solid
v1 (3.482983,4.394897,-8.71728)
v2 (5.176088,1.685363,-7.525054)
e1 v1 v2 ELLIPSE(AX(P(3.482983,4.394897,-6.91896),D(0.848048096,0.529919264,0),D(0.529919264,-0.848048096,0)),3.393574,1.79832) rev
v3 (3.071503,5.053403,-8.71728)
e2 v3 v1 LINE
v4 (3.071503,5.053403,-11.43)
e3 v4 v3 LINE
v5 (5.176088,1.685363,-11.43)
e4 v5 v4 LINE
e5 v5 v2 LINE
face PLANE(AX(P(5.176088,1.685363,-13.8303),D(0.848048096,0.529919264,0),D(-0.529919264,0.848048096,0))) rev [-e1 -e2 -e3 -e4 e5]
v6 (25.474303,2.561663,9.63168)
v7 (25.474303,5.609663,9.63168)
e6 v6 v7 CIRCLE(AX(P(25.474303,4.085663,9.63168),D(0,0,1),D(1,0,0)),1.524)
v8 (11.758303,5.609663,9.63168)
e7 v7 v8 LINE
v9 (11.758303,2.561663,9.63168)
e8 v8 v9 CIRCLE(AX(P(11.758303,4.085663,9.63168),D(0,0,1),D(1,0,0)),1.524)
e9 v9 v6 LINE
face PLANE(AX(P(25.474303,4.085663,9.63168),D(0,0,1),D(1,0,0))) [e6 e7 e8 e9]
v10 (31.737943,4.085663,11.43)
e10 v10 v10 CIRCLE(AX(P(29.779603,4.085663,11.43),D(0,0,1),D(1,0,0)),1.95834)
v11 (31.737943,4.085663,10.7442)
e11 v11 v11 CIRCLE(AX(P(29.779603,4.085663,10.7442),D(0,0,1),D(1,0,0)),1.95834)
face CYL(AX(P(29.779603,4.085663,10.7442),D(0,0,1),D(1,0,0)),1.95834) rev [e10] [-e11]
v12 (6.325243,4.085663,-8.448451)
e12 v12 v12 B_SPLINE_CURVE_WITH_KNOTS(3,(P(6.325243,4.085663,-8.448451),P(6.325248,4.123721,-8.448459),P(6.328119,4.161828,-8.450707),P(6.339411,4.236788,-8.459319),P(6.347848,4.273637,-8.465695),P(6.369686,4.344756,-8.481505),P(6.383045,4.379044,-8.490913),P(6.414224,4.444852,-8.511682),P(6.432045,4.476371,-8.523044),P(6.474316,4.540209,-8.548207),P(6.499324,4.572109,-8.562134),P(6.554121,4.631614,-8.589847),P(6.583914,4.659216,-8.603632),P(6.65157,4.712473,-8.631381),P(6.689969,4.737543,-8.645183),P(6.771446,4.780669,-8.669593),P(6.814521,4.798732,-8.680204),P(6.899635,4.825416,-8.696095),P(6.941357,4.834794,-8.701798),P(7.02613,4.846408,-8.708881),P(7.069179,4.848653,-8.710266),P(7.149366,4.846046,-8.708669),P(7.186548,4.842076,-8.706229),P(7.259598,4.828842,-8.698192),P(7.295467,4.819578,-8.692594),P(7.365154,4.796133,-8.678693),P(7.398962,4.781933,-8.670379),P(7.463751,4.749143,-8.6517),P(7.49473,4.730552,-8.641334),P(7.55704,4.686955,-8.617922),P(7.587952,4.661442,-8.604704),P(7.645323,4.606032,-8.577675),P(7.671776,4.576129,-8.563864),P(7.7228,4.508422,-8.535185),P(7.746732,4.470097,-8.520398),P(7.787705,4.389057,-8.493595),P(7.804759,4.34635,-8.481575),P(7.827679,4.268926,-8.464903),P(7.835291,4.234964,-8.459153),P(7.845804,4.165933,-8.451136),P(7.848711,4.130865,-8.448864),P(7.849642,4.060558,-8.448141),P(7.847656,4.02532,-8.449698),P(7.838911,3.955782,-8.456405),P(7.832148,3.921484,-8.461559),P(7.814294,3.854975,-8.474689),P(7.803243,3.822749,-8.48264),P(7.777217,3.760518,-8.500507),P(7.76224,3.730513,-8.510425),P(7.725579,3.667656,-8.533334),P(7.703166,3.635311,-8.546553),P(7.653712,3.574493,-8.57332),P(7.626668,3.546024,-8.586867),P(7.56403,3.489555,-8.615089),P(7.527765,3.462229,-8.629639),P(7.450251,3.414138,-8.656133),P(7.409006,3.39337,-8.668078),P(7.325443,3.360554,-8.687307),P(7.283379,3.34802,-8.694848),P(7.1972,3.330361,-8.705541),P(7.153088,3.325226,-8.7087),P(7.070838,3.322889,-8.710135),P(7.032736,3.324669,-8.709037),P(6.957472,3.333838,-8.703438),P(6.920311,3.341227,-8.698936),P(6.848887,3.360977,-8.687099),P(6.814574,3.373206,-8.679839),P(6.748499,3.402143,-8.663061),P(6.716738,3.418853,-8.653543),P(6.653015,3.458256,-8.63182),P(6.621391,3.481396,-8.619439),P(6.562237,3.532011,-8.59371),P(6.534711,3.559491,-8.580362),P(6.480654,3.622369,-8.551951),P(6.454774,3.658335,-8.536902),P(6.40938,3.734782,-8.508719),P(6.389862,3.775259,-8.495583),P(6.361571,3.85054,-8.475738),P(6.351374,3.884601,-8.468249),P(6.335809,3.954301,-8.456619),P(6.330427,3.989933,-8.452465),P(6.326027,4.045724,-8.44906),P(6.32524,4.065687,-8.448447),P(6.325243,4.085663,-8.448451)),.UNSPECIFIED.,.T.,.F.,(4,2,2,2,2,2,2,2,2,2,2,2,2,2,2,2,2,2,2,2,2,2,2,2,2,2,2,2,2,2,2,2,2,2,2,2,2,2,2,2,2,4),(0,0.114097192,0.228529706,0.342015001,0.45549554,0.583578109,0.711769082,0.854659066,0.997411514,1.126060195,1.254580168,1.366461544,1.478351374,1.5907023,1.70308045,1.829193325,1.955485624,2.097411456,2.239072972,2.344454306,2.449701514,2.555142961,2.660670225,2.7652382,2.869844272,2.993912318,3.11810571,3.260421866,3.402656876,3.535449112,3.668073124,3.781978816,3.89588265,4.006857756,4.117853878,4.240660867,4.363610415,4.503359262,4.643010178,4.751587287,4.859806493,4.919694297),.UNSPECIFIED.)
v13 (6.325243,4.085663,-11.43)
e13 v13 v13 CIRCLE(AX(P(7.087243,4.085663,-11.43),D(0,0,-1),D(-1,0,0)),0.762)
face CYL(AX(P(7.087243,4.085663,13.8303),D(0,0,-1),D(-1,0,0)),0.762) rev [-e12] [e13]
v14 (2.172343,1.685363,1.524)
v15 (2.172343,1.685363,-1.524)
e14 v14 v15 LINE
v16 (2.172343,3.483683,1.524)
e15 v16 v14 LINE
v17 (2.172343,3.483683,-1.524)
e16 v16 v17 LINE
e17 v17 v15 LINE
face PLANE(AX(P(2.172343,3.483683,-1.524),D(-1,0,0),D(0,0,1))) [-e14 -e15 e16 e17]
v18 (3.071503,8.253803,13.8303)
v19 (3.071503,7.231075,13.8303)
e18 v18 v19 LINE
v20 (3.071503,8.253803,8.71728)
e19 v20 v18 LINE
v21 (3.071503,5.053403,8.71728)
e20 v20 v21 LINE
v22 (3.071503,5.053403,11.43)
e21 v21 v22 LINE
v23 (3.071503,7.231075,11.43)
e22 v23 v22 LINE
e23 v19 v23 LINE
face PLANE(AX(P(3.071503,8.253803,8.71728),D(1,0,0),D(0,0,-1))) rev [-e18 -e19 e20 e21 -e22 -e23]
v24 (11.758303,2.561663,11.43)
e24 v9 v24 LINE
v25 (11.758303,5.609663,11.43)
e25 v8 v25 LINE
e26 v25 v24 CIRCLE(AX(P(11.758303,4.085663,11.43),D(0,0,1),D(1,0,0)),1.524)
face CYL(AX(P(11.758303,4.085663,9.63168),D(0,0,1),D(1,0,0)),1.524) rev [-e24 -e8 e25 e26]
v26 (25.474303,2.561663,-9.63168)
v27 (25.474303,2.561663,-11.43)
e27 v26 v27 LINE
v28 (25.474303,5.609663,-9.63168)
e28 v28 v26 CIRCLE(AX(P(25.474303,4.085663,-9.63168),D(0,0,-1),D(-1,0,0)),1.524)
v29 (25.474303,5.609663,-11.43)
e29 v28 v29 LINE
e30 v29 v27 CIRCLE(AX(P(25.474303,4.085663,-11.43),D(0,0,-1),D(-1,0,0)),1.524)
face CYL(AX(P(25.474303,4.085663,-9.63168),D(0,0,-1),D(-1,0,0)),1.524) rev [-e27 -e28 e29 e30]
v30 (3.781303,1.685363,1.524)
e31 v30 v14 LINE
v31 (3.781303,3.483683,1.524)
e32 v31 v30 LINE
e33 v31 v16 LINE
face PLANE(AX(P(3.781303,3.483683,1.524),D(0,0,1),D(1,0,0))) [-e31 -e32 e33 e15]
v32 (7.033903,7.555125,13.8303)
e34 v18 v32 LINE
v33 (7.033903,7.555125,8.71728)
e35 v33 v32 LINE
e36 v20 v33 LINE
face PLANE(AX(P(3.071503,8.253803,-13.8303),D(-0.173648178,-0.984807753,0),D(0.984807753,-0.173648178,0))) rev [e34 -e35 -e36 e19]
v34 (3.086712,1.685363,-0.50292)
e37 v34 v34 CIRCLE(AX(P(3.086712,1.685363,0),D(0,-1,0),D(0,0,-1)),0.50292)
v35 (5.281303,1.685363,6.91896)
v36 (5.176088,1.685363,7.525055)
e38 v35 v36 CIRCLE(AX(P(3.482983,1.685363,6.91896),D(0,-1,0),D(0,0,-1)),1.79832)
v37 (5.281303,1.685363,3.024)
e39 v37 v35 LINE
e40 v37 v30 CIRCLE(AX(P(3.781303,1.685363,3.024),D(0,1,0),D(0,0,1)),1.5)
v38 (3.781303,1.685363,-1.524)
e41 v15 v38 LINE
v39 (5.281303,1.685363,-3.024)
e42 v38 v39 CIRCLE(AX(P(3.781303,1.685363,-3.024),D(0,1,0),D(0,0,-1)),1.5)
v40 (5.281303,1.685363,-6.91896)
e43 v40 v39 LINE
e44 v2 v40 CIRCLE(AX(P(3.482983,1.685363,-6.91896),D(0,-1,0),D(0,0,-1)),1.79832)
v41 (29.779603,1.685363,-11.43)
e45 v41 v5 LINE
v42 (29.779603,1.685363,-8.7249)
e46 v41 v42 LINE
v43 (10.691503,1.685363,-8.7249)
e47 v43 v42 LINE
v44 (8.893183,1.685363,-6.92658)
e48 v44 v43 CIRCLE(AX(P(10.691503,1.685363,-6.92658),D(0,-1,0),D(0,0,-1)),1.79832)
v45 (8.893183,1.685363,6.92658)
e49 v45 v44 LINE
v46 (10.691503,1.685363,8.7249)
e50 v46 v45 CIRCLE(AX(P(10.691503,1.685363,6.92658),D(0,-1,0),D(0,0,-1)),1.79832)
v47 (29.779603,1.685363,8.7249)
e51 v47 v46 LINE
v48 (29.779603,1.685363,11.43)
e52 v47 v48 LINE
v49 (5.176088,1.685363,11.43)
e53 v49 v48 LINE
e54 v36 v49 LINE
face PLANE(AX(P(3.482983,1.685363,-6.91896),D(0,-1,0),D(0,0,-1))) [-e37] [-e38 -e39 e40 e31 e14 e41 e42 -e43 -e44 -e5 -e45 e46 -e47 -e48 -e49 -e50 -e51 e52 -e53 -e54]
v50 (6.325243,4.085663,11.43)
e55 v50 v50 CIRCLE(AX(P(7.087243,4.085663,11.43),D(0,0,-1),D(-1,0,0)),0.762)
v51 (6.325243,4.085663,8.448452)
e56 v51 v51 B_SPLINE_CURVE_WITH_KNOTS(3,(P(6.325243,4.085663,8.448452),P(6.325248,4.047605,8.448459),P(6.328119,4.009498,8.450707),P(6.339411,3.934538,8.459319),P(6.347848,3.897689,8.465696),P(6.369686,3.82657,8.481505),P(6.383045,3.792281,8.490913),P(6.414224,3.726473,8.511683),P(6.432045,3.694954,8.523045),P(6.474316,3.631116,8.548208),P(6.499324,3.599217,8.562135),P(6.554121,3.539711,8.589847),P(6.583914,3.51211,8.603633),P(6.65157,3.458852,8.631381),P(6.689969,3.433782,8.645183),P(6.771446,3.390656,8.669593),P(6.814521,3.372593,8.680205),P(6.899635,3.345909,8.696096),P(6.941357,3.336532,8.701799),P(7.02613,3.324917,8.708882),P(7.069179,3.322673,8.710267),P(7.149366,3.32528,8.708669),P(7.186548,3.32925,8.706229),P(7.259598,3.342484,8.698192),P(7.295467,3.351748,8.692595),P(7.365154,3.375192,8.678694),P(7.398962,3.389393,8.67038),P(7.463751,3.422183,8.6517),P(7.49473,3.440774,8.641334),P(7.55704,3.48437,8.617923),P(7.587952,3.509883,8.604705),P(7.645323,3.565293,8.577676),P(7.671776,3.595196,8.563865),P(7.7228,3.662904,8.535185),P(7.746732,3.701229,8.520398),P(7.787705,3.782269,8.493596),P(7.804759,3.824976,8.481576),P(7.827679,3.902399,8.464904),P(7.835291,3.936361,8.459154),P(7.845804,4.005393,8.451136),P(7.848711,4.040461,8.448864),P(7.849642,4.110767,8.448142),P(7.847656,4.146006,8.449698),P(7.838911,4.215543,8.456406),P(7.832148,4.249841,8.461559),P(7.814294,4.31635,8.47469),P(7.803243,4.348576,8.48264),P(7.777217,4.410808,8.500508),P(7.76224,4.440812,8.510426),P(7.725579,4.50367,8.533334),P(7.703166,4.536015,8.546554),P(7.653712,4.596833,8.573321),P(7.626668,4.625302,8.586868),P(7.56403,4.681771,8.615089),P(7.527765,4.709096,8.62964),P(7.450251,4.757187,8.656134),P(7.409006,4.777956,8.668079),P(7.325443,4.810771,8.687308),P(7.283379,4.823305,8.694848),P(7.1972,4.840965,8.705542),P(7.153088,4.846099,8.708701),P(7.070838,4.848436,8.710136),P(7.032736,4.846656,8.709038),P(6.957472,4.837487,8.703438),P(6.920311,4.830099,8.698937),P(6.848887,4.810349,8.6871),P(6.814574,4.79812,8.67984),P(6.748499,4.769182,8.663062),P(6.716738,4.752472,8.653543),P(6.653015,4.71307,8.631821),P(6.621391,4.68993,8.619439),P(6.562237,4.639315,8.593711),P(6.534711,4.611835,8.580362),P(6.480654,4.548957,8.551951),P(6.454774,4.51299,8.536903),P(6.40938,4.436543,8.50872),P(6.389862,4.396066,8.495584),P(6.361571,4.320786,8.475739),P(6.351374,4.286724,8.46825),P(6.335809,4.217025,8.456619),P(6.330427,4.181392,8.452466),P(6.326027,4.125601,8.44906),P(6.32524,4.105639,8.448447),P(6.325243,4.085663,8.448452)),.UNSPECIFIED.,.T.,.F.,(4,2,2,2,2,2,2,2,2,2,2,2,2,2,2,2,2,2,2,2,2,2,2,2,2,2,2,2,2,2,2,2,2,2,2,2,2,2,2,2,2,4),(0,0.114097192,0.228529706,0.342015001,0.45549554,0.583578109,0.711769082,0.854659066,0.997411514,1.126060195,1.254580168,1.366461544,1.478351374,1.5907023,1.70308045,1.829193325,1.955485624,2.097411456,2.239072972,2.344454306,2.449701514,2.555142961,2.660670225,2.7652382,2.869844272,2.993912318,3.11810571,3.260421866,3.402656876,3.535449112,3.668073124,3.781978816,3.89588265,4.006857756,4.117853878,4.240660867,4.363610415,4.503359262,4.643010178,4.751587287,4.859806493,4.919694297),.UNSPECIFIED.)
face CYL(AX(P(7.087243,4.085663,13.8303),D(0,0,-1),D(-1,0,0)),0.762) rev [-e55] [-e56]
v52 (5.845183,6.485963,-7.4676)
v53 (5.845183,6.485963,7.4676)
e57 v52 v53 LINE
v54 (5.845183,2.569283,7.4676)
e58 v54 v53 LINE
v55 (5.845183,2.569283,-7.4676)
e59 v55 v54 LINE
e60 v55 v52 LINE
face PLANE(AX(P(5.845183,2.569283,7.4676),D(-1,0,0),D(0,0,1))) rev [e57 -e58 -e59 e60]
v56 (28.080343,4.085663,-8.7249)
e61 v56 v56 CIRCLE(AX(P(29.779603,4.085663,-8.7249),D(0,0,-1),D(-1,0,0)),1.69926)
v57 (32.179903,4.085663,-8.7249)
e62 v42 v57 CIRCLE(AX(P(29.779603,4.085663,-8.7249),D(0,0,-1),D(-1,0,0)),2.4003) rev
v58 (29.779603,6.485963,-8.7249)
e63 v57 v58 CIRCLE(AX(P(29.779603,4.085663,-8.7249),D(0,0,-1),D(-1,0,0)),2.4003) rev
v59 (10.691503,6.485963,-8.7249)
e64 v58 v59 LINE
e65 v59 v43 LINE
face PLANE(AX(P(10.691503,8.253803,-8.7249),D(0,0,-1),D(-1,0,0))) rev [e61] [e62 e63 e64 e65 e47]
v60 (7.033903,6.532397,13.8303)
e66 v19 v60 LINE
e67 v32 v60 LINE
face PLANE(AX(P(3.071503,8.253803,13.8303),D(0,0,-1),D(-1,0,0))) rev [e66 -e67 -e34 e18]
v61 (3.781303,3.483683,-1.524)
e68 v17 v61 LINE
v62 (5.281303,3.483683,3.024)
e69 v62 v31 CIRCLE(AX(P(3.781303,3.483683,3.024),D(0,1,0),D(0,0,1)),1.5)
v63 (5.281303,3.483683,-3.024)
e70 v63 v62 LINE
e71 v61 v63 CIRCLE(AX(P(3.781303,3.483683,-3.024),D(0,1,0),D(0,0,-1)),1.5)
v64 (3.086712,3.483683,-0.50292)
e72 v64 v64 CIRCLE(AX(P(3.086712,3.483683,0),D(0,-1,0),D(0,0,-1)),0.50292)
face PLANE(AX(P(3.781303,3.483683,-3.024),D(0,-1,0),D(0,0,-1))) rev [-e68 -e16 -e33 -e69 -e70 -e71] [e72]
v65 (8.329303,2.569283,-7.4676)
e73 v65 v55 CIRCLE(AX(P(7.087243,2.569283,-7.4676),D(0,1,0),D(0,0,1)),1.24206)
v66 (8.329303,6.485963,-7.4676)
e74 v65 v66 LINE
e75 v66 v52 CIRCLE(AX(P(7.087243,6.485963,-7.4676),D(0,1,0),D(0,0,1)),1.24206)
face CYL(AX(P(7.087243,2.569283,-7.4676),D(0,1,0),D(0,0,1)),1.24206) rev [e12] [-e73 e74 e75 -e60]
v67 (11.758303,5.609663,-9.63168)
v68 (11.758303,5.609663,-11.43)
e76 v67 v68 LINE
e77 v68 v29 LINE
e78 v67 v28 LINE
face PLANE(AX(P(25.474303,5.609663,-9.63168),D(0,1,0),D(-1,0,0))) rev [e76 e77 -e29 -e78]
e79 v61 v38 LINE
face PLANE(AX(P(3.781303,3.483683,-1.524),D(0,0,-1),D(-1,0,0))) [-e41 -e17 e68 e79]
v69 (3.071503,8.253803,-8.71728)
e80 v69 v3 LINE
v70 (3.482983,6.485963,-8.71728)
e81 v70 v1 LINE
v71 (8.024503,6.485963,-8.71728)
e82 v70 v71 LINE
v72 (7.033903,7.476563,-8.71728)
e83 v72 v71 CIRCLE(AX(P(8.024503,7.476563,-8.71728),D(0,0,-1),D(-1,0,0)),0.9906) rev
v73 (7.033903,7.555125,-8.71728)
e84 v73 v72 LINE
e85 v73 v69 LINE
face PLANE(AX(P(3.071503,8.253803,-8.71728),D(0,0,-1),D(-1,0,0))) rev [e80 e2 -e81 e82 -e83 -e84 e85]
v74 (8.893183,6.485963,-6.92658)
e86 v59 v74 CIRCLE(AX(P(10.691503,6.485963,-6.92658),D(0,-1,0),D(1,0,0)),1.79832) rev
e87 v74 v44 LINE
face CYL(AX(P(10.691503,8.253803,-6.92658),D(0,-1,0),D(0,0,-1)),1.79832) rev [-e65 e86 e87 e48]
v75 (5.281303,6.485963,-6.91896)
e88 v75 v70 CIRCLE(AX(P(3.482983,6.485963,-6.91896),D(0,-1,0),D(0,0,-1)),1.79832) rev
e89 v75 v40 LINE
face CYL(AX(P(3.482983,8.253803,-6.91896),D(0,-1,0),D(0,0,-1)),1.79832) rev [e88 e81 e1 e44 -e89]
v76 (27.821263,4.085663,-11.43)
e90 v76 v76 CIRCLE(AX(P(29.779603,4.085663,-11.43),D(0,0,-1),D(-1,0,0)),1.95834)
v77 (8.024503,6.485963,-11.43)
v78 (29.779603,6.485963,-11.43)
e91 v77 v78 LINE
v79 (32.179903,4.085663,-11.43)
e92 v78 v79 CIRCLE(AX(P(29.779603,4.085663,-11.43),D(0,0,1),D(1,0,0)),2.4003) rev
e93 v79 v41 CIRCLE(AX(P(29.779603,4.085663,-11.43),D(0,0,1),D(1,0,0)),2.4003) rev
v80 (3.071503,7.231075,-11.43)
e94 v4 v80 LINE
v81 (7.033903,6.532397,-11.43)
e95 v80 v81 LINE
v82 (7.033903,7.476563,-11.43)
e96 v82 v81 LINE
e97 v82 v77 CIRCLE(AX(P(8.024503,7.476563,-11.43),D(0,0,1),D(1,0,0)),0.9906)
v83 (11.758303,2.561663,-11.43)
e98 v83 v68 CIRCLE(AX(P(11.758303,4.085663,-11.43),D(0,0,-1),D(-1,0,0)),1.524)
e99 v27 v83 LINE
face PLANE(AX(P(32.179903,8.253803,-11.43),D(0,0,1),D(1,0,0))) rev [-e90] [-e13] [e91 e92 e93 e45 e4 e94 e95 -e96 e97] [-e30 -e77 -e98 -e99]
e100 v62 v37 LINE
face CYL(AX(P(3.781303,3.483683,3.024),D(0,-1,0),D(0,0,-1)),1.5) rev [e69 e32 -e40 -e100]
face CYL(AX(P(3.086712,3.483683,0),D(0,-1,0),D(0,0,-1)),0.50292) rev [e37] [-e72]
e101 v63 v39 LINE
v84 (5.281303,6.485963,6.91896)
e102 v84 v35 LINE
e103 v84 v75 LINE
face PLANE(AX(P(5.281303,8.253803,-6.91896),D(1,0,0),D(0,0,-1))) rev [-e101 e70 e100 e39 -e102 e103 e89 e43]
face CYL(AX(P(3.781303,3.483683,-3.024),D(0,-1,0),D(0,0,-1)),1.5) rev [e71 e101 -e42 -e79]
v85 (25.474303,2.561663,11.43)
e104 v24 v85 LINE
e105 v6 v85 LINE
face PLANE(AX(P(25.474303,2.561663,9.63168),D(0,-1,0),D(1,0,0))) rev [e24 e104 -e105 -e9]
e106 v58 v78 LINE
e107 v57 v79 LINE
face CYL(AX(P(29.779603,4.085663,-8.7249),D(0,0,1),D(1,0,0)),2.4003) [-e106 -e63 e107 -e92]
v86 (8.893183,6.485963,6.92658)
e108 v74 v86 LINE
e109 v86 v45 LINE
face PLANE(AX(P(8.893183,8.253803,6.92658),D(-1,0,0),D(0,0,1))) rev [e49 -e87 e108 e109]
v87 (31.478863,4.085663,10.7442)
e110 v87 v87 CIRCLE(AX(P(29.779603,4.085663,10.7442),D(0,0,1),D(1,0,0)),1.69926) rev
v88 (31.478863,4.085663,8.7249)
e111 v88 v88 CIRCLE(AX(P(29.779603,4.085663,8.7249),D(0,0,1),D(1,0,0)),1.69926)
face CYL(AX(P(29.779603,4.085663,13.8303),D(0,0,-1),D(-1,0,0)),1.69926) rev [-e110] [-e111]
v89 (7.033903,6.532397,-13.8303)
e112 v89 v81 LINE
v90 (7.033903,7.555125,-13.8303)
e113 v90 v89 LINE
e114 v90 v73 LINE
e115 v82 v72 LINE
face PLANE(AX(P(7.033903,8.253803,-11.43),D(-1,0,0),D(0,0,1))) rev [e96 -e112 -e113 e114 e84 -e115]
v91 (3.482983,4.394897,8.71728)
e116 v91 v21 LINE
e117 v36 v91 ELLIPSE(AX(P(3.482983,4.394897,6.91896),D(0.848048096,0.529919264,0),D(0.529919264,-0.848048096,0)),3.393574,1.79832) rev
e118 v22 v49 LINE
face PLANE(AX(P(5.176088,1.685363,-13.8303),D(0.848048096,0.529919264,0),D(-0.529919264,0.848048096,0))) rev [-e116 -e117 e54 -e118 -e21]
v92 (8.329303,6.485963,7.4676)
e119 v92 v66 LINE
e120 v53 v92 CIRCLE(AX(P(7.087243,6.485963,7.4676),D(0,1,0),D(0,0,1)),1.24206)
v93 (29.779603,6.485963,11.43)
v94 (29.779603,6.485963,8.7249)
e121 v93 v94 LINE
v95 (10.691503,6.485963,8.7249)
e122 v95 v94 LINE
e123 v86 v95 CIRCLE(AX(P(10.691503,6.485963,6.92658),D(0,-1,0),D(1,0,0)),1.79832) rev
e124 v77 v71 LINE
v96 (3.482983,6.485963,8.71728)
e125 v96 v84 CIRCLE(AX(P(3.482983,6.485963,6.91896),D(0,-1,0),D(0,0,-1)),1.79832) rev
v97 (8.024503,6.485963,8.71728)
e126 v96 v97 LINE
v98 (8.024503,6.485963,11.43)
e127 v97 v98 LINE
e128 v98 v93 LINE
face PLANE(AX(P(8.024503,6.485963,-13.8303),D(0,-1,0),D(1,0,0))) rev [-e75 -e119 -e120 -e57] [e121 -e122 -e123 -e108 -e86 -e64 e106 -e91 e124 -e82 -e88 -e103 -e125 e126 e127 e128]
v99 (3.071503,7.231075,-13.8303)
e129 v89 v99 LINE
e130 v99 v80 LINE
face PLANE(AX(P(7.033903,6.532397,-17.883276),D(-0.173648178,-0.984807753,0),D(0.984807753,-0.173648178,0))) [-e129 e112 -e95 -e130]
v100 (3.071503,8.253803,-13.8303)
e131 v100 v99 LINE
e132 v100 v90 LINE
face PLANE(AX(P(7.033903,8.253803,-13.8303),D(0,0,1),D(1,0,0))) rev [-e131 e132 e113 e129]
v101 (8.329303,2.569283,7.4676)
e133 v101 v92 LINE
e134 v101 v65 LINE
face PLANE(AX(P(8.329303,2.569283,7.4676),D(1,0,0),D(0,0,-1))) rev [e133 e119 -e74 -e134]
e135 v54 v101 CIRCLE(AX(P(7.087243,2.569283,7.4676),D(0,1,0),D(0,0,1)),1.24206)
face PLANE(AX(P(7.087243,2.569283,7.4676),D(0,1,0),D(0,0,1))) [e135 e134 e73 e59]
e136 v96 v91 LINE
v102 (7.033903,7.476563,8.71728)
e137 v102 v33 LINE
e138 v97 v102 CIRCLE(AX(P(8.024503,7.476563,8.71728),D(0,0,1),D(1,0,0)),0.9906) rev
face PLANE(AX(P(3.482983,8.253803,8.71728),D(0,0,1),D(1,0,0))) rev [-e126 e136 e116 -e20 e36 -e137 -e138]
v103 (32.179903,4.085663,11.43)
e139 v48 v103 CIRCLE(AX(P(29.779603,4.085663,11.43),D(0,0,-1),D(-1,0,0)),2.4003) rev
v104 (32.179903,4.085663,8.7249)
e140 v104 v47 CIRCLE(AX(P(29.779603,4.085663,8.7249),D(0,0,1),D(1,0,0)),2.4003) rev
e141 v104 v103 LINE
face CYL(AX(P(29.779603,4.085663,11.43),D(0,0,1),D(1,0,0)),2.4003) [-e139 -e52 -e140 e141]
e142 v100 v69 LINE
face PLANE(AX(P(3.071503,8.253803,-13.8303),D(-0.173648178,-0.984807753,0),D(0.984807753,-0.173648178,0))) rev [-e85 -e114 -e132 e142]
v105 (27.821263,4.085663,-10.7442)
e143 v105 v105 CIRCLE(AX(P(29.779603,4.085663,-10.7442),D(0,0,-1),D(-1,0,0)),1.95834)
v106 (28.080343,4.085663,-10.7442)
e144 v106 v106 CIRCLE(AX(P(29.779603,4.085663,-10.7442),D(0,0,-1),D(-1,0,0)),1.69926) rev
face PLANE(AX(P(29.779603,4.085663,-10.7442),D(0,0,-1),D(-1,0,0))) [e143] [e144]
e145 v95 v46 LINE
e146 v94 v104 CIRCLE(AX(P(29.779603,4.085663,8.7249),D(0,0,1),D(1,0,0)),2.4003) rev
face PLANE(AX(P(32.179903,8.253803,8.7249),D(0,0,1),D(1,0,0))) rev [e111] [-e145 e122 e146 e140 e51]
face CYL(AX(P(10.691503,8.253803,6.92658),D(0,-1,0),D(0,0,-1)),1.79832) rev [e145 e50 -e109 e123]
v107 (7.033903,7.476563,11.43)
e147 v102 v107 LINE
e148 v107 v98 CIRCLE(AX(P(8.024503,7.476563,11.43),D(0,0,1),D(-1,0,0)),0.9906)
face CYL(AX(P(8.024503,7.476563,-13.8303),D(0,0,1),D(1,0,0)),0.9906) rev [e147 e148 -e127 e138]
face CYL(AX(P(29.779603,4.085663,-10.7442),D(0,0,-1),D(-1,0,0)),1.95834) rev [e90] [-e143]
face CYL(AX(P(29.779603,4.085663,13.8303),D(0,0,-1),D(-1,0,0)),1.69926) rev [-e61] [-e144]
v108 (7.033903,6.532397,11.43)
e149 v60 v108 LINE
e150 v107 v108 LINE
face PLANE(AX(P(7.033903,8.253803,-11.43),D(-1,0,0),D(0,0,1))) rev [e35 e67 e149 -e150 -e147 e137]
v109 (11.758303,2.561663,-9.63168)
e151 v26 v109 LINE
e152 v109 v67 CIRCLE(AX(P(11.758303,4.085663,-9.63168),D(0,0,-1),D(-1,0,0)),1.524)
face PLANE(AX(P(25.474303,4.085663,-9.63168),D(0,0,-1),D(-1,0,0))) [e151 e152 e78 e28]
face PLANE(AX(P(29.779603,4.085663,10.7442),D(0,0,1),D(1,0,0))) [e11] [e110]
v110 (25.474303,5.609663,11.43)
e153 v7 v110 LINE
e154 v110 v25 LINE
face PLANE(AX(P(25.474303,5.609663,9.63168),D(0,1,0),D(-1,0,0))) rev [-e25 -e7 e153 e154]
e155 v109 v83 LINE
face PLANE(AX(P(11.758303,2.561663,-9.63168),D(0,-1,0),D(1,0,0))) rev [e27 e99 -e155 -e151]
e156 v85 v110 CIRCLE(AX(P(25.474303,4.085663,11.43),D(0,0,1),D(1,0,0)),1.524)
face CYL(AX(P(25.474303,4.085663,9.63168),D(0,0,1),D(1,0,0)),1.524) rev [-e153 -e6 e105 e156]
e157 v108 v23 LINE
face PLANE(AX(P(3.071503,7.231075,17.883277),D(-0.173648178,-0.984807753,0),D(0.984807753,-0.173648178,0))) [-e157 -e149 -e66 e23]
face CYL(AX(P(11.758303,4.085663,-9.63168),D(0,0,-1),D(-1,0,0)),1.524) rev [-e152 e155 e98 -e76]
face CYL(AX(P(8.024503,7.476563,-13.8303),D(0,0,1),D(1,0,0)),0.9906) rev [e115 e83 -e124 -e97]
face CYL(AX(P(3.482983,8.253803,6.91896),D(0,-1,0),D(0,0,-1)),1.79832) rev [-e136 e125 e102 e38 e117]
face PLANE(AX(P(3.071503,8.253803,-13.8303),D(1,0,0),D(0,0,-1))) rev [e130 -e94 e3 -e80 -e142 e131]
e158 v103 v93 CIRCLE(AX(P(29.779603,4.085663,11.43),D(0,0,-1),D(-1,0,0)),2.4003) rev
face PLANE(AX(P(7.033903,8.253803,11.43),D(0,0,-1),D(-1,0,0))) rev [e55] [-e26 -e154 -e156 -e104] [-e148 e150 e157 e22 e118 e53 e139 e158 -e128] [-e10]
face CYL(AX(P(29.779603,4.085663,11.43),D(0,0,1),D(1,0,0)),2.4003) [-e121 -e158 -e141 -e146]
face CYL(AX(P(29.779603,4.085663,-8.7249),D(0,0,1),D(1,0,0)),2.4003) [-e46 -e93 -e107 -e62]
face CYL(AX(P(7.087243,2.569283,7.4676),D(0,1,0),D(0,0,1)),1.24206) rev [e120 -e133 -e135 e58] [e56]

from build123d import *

# Parameters (mm, degrees)
BOSS_EXTRUDE1_DEPTH = 10.9474
CUT_EXTRUDE1_DEPTH  = 66.230102934
CUT_EXTRUDE2_DEPTH  = 63.46692107
SKETCH4_W           = 29.0576
SKETCH4_H           = 2.9464
CUT_EXTRUDE3_DEPTH  = 10.9474
CUT_EXTRUDE4_DEPTH  = 6.5278
FILLET1_R           = 4.0005
CUT_EXTRUDE5_DEPTH  = 66.230102934
CUT_EXTRUDE6_DEPTH  = 4.0005
CUT_EXTRUDE7_DEPTH  = 4.0005
SKETCH9_R           = 2.8321
CUT_EXTRUDE8_DEPTH  = 63.46692107
SKETCH10_R          = 3.2639
CUT_EXTRUDE9_DEPTH  = 1.143
CUT_EXTRUDE10_START = -1.143
SKETCH11_R          = 3.2639
CUT_EXTRUDE10_DEPTH = 1.143
CUT_EXTRUDE11_DEPTH = 2.9972
CUT_EXTRUDE13_START = -2.9972
CUT_EXTRUDE13_DEPTH = 2.9972
SKETCH14_R          = 1.27
CUT_EXTRUDE14_DEPTH = 63.46692107
SKETCH15_R          = 0.8382
BOSS_EXTRUDE2_DEPTH = 2.9972
CUT_EXTRUDE15_DEPTH = 4.0005
CUT_EXTRUDE16_DEPTH = 4.0005
SCALE1_SCALE        = 0.6


with BuildPart() as part:
    # Sketch1 → Boss-Extrude1 (new body)
    with BuildSketch(Plane(origin=(0, 0, 0), x_dir=(1, 0, 0), z_dir=(0, 1, 0))):
        with BuildLine():
            Line((0, 11.5316), (0, -11.5316))
            ThreePointArc((0, -11.5316), (-0.877859555, -13.650940445), (-2.9972, -14.5288))
            Line((-2.9972, -14.5288), (-3.683, -14.5288))
            Line((-3.683, -14.5288), (-3.683, -23.0505))
            Line((-3.683, -23.0505), (2.921, -23.0505))
            Line((2.921, -23.0505), (2.921, -19.05))
            Line((2.921, -19.05), (44.831, -19.05))
            Line((44.831, -19.05), (44.831, -14.5415))
            Line((44.831, -14.5415), (9.017, -14.5415))
            ThreePointArc((9.017, -14.5415), (6.897659555, -13.663640445), (6.0198, -11.5443))
            Line((6.0198, -11.5443), (6.0198, 11.5443))
            ThreePointArc((6.0198, 11.5443), (6.897659555, 13.663640445), (9.017, 14.5415))
            Line((9.017, 14.5415), (44.831, 14.5415))
            Line((44.831, 14.5415), (44.831, 19.05))
            Line((44.831, 19.05), (2.921, 19.05))
            Line((2.921, 19.05), (2.921, 23.0505))
            Line((2.921, 23.0505), (-3.683, 23.0505))
            Line((-3.683, 23.0505), (-3.683, 14.5288))
            Line((-3.683, 14.5288), (-2.9972, 14.5288))
            ThreePointArc((-2.9972, 14.5288), (-0.877859555, 13.650940445), (0, 11.5316))
        make_face()
    extrude(amount=BOSS_EXTRUDE1_DEPTH)

    # Sketch2 → Cut-Extrude1 (cut, through all)
    with BuildSketch(Plane.XY.offset(23.0505)):
        Polygon((-0.17535838, 0), (-3.683, 5.6134), (-3.683, 0), align=None)
    extrude(amount=-CUT_EXTRUDE1_DEPTH, mode=Mode.SUBTRACT)

    # Sketch3 → Cut-Extrude2 (cut, through all)
    with BuildSketch(Plane.XY.offset(19.05)):
        with BuildLine():
            Line((4.572, 8.001), (44.831, 8.001))
            Line((44.831, 8.001), (44.831, 10.9474))
            Line((44.831, 10.9474), (2.921, 10.9474))
            Line((2.921, 10.9474), (2.921, 9.652))
            ThreePointArc((2.921, 9.652), (3.404566704, 8.484566704), (4.572, 8.001))
        make_face()
    extrude(amount=-CUT_EXTRUDE2_DEPTH, mode=Mode.SUBTRACT)

    # Sketch4 → Cut-Extrude3 (cut)
    with BuildSketch(Plane(origin=(6.0198, 0, 0), x_dir=(0, 0, -1), z_dir=(1, 0, 0))):
        with Locations((0, 9.4742)):
            Rectangle(SKETCH4_W, SKETCH4_H)
    extrude(amount=-CUT_EXTRUDE3_DEPTH, mode=Mode.SUBTRACT)

    # Sketch5 → Cut-Extrude4 (cut)
    with BuildSketch(Plane(origin=(0, 8.001, 0), x_dir=(1, 0, 0), z_dir=(0, 1, 0))):
        with BuildLine():
            Line((0.9398, -12.446), (0.9398, 12.446))
            ThreePointArc((0.9398, 12.446), (3.0099, 14.5161), (5.08, 12.446))
            Line((5.08, 12.446), (5.08, -12.446))
            ThreePointArc((5.08, -12.446), (3.0099, -14.5161), (0.9398, -12.446))
        make_face()
    extrude(amount=-CUT_EXTRUDE4_DEPTH, mode=Mode.SUBTRACT)

    # Fillet1
    fillet1_edges = [part.edges().sort_by_distance(p)[0] for p in [
        (44.831, 8.001, -16.79575),
        (44.831, 0, -16.79575),
        (44.831, 0, 16.79575),
        (44.831, 8.001, 16.79575),
    ]]
    fillet(fillet1_edges, radius=FILLET1_R - 0.0001)  # a hair under: the kernel refuses the full size

    # Sketch6 → Cut-Extrude5 (cut, through all)
    with BuildSketch(Plane.XY.offset(23.0505)):
        Polygon((-3.683, 10.9474), (2.921, 9.782936619), (2.921, 10.9474), align=None)
    extrude(amount=-CUT_EXTRUDE5_DEPTH, mode=Mode.SUBTRACT)

    # Sketch7 → Cut-Extrude6 (cut)
    with BuildSketch(Plane.XY.offset(23.0505)):
        Polygon((-3.683, 8.987220468), (-3.683, 5.6134), (-0.17535838, 0), (2.921, 0), (2.921, 7.822757088), align=None)
    extrude(amount=-CUT_EXTRUDE6_DEPTH, mode=Mode.SUBTRACT)

    # Sketch8 → Cut-Extrude7 (cut)
    with BuildSketch(Plane(origin=(0, 0, -23.0505), x_dir=(-1, 0, 0), z_dir=(0, 0, -1))):
        Polygon((3.683, 8.987220468), (-2.921, 7.822757088), (-2.921, 0), (0.17535838, 0), (3.683, 5.6134), align=None)
    extrude(amount=-CUT_EXTRUDE7_DEPTH, mode=Mode.SUBTRACT)

    # Sketch9 → Cut-Extrude8 (cut, through all)
    with BuildSketch(Plane(origin=(0, 0, -19.05), x_dir=(-1, 0, 0), z_dir=(0, 0, -1))):
        with Locations((-40.8305, 4.0005)):
            Circle(SKETCH9_R)
    extrude(amount=-CUT_EXTRUDE8_DEPTH, mode=Mode.SUBTRACT)

    # Sketch10 → Cut-Extrude9 (cut)
    with BuildSketch(Plane(origin=(0, 0, -19.05), x_dir=(-1, 0, 0), z_dir=(0, 0, -1))):
        with Locations((-40.8305, 4.0005)):
            Circle(SKETCH10_R)
    extrude(amount=-CUT_EXTRUDE9_DEPTH, mode=Mode.SUBTRACT)

    # Sketch11 → Cut-Extrude10 (cut)
    with BuildSketch(Plane.XY.offset(19.05).offset(CUT_EXTRUDE10_START)):
        with Locations(Location((40.8305, 4.0005, 0), (0, 0, 180))):
            Circle(SKETCH11_R)
    extrude(amount=CUT_EXTRUDE10_DEPTH, mode=Mode.SUBTRACT)

    # Sketch12 → Cut-Extrude11 (cut)
    with BuildSketch(Plane.XY.offset(19.05)):
        with BuildLine():
            Line((33.655, 1.4605), (10.795, 1.4605))
            ThreePointArc((10.795, 1.4605), (8.255, 4.0005), (10.795, 6.5405))
            Line((10.795, 6.5405), (33.655, 6.5405))
            ThreePointArc((33.655, 6.5405), (36.195, 4.0005), (33.655, 1.4605))
        make_face()
    extrude(amount=-CUT_EXTRUDE11_DEPTH, mode=Mode.SUBTRACT)

    # Sketch13 → Cut-Extrude13 (cut)
    with BuildSketch(Plane(origin=(0, 0, -19.05), x_dir=(-1, 0, 0), z_dir=(0, 0, -1)).offset(CUT_EXTRUDE13_START)):
        with BuildLine():
            Line((-33.655, 6.5405), (-10.795, 6.5405))
            ThreePointArc((-10.795, 6.5405), (-8.255, 4.0005), (-10.795, 1.4605))
            Line((-10.795, 1.4605), (-33.655, 1.4605))
            ThreePointArc((-33.655, 1.4605), (-36.195, 4.0005), (-33.655, 6.5405))
        make_face()
    extrude(amount=CUT_EXTRUDE13_DEPTH, mode=Mode.SUBTRACT)

    # Sketch14 → Cut-Extrude14 (cut, through all)
    with BuildSketch(Plane(origin=(0, 0, -19.05), x_dir=(-1, 0, 0), z_dir=(0, 0, -1))):
        with Locations((-3.0099, 4.0005)):
            Circle(SKETCH14_R)
    extrude(amount=-CUT_EXTRUDE14_DEPTH, mode=Mode.SUBTRACT)

    # Sketch15 → Boss-Extrude2 (add)
    with BuildSketch(Plane.XZ):
        with BuildLine():
            Line((-5.1816, -2.54), (-5.1816, 2.54))
            Line((-5.1816, 2.54), (-2.499999953, 2.54))
            ThreePointArc((-2.499999953, 2.54), (-0.732233033, 3.272233033), (0, 5.039999953))
            Line((0, 5.039999953), (0, -5.039999953))
            ThreePointArc((0, -5.039999953), (-0.732233033, -3.272233033), (-2.499999953, -2.54))
            Line((-2.499999953, -2.54), (-5.1816, -2.54))
        make_face()
        with Locations(Location((-3.657652297, 0, 0), (0, 0, 270))):
            Circle(SKETCH15_R, mode=Mode.SUBTRACT)
    extrude(amount=-BOSS_EXTRUDE2_DEPTH)

    # Sketch16 → Cut-Extrude15 (cut)
    with BuildSketch(Plane.XY.offset(19.05)):
        Polygon((2.921, 7.822757088), (-3.683, 8.987220468), (-3.683, 9.24285301), (2.921, 8.078389629), align=None)
    extrude(amount=CUT_EXTRUDE15_DEPTH, mode=Mode.SUBTRACT)

    # Sketch17 → Cut-Extrude16 (cut)
    with BuildSketch(Plane(origin=(0, 0, -19.05), x_dir=(-1, 0, 0), z_dir=(0, 0, -1))):
        Polygon((-2.921, 8.078389629), (3.683, 9.24285301), (3.683, 8.987220468), (-2.921, 7.822757088), align=None)
    extrude(amount=CUT_EXTRUDE16_DEPTH, mode=Mode.SUBTRACT)


with BuildPart() as part_1:
    # Scale1: scaled about (13.203263525, 4.213395444, -2.977e-06)
    add(part.part.scale(SCALE1_SCALE).moved(Location((5.28130541, 1.685358178, -1.191e-06))))


solid = part_1.part
